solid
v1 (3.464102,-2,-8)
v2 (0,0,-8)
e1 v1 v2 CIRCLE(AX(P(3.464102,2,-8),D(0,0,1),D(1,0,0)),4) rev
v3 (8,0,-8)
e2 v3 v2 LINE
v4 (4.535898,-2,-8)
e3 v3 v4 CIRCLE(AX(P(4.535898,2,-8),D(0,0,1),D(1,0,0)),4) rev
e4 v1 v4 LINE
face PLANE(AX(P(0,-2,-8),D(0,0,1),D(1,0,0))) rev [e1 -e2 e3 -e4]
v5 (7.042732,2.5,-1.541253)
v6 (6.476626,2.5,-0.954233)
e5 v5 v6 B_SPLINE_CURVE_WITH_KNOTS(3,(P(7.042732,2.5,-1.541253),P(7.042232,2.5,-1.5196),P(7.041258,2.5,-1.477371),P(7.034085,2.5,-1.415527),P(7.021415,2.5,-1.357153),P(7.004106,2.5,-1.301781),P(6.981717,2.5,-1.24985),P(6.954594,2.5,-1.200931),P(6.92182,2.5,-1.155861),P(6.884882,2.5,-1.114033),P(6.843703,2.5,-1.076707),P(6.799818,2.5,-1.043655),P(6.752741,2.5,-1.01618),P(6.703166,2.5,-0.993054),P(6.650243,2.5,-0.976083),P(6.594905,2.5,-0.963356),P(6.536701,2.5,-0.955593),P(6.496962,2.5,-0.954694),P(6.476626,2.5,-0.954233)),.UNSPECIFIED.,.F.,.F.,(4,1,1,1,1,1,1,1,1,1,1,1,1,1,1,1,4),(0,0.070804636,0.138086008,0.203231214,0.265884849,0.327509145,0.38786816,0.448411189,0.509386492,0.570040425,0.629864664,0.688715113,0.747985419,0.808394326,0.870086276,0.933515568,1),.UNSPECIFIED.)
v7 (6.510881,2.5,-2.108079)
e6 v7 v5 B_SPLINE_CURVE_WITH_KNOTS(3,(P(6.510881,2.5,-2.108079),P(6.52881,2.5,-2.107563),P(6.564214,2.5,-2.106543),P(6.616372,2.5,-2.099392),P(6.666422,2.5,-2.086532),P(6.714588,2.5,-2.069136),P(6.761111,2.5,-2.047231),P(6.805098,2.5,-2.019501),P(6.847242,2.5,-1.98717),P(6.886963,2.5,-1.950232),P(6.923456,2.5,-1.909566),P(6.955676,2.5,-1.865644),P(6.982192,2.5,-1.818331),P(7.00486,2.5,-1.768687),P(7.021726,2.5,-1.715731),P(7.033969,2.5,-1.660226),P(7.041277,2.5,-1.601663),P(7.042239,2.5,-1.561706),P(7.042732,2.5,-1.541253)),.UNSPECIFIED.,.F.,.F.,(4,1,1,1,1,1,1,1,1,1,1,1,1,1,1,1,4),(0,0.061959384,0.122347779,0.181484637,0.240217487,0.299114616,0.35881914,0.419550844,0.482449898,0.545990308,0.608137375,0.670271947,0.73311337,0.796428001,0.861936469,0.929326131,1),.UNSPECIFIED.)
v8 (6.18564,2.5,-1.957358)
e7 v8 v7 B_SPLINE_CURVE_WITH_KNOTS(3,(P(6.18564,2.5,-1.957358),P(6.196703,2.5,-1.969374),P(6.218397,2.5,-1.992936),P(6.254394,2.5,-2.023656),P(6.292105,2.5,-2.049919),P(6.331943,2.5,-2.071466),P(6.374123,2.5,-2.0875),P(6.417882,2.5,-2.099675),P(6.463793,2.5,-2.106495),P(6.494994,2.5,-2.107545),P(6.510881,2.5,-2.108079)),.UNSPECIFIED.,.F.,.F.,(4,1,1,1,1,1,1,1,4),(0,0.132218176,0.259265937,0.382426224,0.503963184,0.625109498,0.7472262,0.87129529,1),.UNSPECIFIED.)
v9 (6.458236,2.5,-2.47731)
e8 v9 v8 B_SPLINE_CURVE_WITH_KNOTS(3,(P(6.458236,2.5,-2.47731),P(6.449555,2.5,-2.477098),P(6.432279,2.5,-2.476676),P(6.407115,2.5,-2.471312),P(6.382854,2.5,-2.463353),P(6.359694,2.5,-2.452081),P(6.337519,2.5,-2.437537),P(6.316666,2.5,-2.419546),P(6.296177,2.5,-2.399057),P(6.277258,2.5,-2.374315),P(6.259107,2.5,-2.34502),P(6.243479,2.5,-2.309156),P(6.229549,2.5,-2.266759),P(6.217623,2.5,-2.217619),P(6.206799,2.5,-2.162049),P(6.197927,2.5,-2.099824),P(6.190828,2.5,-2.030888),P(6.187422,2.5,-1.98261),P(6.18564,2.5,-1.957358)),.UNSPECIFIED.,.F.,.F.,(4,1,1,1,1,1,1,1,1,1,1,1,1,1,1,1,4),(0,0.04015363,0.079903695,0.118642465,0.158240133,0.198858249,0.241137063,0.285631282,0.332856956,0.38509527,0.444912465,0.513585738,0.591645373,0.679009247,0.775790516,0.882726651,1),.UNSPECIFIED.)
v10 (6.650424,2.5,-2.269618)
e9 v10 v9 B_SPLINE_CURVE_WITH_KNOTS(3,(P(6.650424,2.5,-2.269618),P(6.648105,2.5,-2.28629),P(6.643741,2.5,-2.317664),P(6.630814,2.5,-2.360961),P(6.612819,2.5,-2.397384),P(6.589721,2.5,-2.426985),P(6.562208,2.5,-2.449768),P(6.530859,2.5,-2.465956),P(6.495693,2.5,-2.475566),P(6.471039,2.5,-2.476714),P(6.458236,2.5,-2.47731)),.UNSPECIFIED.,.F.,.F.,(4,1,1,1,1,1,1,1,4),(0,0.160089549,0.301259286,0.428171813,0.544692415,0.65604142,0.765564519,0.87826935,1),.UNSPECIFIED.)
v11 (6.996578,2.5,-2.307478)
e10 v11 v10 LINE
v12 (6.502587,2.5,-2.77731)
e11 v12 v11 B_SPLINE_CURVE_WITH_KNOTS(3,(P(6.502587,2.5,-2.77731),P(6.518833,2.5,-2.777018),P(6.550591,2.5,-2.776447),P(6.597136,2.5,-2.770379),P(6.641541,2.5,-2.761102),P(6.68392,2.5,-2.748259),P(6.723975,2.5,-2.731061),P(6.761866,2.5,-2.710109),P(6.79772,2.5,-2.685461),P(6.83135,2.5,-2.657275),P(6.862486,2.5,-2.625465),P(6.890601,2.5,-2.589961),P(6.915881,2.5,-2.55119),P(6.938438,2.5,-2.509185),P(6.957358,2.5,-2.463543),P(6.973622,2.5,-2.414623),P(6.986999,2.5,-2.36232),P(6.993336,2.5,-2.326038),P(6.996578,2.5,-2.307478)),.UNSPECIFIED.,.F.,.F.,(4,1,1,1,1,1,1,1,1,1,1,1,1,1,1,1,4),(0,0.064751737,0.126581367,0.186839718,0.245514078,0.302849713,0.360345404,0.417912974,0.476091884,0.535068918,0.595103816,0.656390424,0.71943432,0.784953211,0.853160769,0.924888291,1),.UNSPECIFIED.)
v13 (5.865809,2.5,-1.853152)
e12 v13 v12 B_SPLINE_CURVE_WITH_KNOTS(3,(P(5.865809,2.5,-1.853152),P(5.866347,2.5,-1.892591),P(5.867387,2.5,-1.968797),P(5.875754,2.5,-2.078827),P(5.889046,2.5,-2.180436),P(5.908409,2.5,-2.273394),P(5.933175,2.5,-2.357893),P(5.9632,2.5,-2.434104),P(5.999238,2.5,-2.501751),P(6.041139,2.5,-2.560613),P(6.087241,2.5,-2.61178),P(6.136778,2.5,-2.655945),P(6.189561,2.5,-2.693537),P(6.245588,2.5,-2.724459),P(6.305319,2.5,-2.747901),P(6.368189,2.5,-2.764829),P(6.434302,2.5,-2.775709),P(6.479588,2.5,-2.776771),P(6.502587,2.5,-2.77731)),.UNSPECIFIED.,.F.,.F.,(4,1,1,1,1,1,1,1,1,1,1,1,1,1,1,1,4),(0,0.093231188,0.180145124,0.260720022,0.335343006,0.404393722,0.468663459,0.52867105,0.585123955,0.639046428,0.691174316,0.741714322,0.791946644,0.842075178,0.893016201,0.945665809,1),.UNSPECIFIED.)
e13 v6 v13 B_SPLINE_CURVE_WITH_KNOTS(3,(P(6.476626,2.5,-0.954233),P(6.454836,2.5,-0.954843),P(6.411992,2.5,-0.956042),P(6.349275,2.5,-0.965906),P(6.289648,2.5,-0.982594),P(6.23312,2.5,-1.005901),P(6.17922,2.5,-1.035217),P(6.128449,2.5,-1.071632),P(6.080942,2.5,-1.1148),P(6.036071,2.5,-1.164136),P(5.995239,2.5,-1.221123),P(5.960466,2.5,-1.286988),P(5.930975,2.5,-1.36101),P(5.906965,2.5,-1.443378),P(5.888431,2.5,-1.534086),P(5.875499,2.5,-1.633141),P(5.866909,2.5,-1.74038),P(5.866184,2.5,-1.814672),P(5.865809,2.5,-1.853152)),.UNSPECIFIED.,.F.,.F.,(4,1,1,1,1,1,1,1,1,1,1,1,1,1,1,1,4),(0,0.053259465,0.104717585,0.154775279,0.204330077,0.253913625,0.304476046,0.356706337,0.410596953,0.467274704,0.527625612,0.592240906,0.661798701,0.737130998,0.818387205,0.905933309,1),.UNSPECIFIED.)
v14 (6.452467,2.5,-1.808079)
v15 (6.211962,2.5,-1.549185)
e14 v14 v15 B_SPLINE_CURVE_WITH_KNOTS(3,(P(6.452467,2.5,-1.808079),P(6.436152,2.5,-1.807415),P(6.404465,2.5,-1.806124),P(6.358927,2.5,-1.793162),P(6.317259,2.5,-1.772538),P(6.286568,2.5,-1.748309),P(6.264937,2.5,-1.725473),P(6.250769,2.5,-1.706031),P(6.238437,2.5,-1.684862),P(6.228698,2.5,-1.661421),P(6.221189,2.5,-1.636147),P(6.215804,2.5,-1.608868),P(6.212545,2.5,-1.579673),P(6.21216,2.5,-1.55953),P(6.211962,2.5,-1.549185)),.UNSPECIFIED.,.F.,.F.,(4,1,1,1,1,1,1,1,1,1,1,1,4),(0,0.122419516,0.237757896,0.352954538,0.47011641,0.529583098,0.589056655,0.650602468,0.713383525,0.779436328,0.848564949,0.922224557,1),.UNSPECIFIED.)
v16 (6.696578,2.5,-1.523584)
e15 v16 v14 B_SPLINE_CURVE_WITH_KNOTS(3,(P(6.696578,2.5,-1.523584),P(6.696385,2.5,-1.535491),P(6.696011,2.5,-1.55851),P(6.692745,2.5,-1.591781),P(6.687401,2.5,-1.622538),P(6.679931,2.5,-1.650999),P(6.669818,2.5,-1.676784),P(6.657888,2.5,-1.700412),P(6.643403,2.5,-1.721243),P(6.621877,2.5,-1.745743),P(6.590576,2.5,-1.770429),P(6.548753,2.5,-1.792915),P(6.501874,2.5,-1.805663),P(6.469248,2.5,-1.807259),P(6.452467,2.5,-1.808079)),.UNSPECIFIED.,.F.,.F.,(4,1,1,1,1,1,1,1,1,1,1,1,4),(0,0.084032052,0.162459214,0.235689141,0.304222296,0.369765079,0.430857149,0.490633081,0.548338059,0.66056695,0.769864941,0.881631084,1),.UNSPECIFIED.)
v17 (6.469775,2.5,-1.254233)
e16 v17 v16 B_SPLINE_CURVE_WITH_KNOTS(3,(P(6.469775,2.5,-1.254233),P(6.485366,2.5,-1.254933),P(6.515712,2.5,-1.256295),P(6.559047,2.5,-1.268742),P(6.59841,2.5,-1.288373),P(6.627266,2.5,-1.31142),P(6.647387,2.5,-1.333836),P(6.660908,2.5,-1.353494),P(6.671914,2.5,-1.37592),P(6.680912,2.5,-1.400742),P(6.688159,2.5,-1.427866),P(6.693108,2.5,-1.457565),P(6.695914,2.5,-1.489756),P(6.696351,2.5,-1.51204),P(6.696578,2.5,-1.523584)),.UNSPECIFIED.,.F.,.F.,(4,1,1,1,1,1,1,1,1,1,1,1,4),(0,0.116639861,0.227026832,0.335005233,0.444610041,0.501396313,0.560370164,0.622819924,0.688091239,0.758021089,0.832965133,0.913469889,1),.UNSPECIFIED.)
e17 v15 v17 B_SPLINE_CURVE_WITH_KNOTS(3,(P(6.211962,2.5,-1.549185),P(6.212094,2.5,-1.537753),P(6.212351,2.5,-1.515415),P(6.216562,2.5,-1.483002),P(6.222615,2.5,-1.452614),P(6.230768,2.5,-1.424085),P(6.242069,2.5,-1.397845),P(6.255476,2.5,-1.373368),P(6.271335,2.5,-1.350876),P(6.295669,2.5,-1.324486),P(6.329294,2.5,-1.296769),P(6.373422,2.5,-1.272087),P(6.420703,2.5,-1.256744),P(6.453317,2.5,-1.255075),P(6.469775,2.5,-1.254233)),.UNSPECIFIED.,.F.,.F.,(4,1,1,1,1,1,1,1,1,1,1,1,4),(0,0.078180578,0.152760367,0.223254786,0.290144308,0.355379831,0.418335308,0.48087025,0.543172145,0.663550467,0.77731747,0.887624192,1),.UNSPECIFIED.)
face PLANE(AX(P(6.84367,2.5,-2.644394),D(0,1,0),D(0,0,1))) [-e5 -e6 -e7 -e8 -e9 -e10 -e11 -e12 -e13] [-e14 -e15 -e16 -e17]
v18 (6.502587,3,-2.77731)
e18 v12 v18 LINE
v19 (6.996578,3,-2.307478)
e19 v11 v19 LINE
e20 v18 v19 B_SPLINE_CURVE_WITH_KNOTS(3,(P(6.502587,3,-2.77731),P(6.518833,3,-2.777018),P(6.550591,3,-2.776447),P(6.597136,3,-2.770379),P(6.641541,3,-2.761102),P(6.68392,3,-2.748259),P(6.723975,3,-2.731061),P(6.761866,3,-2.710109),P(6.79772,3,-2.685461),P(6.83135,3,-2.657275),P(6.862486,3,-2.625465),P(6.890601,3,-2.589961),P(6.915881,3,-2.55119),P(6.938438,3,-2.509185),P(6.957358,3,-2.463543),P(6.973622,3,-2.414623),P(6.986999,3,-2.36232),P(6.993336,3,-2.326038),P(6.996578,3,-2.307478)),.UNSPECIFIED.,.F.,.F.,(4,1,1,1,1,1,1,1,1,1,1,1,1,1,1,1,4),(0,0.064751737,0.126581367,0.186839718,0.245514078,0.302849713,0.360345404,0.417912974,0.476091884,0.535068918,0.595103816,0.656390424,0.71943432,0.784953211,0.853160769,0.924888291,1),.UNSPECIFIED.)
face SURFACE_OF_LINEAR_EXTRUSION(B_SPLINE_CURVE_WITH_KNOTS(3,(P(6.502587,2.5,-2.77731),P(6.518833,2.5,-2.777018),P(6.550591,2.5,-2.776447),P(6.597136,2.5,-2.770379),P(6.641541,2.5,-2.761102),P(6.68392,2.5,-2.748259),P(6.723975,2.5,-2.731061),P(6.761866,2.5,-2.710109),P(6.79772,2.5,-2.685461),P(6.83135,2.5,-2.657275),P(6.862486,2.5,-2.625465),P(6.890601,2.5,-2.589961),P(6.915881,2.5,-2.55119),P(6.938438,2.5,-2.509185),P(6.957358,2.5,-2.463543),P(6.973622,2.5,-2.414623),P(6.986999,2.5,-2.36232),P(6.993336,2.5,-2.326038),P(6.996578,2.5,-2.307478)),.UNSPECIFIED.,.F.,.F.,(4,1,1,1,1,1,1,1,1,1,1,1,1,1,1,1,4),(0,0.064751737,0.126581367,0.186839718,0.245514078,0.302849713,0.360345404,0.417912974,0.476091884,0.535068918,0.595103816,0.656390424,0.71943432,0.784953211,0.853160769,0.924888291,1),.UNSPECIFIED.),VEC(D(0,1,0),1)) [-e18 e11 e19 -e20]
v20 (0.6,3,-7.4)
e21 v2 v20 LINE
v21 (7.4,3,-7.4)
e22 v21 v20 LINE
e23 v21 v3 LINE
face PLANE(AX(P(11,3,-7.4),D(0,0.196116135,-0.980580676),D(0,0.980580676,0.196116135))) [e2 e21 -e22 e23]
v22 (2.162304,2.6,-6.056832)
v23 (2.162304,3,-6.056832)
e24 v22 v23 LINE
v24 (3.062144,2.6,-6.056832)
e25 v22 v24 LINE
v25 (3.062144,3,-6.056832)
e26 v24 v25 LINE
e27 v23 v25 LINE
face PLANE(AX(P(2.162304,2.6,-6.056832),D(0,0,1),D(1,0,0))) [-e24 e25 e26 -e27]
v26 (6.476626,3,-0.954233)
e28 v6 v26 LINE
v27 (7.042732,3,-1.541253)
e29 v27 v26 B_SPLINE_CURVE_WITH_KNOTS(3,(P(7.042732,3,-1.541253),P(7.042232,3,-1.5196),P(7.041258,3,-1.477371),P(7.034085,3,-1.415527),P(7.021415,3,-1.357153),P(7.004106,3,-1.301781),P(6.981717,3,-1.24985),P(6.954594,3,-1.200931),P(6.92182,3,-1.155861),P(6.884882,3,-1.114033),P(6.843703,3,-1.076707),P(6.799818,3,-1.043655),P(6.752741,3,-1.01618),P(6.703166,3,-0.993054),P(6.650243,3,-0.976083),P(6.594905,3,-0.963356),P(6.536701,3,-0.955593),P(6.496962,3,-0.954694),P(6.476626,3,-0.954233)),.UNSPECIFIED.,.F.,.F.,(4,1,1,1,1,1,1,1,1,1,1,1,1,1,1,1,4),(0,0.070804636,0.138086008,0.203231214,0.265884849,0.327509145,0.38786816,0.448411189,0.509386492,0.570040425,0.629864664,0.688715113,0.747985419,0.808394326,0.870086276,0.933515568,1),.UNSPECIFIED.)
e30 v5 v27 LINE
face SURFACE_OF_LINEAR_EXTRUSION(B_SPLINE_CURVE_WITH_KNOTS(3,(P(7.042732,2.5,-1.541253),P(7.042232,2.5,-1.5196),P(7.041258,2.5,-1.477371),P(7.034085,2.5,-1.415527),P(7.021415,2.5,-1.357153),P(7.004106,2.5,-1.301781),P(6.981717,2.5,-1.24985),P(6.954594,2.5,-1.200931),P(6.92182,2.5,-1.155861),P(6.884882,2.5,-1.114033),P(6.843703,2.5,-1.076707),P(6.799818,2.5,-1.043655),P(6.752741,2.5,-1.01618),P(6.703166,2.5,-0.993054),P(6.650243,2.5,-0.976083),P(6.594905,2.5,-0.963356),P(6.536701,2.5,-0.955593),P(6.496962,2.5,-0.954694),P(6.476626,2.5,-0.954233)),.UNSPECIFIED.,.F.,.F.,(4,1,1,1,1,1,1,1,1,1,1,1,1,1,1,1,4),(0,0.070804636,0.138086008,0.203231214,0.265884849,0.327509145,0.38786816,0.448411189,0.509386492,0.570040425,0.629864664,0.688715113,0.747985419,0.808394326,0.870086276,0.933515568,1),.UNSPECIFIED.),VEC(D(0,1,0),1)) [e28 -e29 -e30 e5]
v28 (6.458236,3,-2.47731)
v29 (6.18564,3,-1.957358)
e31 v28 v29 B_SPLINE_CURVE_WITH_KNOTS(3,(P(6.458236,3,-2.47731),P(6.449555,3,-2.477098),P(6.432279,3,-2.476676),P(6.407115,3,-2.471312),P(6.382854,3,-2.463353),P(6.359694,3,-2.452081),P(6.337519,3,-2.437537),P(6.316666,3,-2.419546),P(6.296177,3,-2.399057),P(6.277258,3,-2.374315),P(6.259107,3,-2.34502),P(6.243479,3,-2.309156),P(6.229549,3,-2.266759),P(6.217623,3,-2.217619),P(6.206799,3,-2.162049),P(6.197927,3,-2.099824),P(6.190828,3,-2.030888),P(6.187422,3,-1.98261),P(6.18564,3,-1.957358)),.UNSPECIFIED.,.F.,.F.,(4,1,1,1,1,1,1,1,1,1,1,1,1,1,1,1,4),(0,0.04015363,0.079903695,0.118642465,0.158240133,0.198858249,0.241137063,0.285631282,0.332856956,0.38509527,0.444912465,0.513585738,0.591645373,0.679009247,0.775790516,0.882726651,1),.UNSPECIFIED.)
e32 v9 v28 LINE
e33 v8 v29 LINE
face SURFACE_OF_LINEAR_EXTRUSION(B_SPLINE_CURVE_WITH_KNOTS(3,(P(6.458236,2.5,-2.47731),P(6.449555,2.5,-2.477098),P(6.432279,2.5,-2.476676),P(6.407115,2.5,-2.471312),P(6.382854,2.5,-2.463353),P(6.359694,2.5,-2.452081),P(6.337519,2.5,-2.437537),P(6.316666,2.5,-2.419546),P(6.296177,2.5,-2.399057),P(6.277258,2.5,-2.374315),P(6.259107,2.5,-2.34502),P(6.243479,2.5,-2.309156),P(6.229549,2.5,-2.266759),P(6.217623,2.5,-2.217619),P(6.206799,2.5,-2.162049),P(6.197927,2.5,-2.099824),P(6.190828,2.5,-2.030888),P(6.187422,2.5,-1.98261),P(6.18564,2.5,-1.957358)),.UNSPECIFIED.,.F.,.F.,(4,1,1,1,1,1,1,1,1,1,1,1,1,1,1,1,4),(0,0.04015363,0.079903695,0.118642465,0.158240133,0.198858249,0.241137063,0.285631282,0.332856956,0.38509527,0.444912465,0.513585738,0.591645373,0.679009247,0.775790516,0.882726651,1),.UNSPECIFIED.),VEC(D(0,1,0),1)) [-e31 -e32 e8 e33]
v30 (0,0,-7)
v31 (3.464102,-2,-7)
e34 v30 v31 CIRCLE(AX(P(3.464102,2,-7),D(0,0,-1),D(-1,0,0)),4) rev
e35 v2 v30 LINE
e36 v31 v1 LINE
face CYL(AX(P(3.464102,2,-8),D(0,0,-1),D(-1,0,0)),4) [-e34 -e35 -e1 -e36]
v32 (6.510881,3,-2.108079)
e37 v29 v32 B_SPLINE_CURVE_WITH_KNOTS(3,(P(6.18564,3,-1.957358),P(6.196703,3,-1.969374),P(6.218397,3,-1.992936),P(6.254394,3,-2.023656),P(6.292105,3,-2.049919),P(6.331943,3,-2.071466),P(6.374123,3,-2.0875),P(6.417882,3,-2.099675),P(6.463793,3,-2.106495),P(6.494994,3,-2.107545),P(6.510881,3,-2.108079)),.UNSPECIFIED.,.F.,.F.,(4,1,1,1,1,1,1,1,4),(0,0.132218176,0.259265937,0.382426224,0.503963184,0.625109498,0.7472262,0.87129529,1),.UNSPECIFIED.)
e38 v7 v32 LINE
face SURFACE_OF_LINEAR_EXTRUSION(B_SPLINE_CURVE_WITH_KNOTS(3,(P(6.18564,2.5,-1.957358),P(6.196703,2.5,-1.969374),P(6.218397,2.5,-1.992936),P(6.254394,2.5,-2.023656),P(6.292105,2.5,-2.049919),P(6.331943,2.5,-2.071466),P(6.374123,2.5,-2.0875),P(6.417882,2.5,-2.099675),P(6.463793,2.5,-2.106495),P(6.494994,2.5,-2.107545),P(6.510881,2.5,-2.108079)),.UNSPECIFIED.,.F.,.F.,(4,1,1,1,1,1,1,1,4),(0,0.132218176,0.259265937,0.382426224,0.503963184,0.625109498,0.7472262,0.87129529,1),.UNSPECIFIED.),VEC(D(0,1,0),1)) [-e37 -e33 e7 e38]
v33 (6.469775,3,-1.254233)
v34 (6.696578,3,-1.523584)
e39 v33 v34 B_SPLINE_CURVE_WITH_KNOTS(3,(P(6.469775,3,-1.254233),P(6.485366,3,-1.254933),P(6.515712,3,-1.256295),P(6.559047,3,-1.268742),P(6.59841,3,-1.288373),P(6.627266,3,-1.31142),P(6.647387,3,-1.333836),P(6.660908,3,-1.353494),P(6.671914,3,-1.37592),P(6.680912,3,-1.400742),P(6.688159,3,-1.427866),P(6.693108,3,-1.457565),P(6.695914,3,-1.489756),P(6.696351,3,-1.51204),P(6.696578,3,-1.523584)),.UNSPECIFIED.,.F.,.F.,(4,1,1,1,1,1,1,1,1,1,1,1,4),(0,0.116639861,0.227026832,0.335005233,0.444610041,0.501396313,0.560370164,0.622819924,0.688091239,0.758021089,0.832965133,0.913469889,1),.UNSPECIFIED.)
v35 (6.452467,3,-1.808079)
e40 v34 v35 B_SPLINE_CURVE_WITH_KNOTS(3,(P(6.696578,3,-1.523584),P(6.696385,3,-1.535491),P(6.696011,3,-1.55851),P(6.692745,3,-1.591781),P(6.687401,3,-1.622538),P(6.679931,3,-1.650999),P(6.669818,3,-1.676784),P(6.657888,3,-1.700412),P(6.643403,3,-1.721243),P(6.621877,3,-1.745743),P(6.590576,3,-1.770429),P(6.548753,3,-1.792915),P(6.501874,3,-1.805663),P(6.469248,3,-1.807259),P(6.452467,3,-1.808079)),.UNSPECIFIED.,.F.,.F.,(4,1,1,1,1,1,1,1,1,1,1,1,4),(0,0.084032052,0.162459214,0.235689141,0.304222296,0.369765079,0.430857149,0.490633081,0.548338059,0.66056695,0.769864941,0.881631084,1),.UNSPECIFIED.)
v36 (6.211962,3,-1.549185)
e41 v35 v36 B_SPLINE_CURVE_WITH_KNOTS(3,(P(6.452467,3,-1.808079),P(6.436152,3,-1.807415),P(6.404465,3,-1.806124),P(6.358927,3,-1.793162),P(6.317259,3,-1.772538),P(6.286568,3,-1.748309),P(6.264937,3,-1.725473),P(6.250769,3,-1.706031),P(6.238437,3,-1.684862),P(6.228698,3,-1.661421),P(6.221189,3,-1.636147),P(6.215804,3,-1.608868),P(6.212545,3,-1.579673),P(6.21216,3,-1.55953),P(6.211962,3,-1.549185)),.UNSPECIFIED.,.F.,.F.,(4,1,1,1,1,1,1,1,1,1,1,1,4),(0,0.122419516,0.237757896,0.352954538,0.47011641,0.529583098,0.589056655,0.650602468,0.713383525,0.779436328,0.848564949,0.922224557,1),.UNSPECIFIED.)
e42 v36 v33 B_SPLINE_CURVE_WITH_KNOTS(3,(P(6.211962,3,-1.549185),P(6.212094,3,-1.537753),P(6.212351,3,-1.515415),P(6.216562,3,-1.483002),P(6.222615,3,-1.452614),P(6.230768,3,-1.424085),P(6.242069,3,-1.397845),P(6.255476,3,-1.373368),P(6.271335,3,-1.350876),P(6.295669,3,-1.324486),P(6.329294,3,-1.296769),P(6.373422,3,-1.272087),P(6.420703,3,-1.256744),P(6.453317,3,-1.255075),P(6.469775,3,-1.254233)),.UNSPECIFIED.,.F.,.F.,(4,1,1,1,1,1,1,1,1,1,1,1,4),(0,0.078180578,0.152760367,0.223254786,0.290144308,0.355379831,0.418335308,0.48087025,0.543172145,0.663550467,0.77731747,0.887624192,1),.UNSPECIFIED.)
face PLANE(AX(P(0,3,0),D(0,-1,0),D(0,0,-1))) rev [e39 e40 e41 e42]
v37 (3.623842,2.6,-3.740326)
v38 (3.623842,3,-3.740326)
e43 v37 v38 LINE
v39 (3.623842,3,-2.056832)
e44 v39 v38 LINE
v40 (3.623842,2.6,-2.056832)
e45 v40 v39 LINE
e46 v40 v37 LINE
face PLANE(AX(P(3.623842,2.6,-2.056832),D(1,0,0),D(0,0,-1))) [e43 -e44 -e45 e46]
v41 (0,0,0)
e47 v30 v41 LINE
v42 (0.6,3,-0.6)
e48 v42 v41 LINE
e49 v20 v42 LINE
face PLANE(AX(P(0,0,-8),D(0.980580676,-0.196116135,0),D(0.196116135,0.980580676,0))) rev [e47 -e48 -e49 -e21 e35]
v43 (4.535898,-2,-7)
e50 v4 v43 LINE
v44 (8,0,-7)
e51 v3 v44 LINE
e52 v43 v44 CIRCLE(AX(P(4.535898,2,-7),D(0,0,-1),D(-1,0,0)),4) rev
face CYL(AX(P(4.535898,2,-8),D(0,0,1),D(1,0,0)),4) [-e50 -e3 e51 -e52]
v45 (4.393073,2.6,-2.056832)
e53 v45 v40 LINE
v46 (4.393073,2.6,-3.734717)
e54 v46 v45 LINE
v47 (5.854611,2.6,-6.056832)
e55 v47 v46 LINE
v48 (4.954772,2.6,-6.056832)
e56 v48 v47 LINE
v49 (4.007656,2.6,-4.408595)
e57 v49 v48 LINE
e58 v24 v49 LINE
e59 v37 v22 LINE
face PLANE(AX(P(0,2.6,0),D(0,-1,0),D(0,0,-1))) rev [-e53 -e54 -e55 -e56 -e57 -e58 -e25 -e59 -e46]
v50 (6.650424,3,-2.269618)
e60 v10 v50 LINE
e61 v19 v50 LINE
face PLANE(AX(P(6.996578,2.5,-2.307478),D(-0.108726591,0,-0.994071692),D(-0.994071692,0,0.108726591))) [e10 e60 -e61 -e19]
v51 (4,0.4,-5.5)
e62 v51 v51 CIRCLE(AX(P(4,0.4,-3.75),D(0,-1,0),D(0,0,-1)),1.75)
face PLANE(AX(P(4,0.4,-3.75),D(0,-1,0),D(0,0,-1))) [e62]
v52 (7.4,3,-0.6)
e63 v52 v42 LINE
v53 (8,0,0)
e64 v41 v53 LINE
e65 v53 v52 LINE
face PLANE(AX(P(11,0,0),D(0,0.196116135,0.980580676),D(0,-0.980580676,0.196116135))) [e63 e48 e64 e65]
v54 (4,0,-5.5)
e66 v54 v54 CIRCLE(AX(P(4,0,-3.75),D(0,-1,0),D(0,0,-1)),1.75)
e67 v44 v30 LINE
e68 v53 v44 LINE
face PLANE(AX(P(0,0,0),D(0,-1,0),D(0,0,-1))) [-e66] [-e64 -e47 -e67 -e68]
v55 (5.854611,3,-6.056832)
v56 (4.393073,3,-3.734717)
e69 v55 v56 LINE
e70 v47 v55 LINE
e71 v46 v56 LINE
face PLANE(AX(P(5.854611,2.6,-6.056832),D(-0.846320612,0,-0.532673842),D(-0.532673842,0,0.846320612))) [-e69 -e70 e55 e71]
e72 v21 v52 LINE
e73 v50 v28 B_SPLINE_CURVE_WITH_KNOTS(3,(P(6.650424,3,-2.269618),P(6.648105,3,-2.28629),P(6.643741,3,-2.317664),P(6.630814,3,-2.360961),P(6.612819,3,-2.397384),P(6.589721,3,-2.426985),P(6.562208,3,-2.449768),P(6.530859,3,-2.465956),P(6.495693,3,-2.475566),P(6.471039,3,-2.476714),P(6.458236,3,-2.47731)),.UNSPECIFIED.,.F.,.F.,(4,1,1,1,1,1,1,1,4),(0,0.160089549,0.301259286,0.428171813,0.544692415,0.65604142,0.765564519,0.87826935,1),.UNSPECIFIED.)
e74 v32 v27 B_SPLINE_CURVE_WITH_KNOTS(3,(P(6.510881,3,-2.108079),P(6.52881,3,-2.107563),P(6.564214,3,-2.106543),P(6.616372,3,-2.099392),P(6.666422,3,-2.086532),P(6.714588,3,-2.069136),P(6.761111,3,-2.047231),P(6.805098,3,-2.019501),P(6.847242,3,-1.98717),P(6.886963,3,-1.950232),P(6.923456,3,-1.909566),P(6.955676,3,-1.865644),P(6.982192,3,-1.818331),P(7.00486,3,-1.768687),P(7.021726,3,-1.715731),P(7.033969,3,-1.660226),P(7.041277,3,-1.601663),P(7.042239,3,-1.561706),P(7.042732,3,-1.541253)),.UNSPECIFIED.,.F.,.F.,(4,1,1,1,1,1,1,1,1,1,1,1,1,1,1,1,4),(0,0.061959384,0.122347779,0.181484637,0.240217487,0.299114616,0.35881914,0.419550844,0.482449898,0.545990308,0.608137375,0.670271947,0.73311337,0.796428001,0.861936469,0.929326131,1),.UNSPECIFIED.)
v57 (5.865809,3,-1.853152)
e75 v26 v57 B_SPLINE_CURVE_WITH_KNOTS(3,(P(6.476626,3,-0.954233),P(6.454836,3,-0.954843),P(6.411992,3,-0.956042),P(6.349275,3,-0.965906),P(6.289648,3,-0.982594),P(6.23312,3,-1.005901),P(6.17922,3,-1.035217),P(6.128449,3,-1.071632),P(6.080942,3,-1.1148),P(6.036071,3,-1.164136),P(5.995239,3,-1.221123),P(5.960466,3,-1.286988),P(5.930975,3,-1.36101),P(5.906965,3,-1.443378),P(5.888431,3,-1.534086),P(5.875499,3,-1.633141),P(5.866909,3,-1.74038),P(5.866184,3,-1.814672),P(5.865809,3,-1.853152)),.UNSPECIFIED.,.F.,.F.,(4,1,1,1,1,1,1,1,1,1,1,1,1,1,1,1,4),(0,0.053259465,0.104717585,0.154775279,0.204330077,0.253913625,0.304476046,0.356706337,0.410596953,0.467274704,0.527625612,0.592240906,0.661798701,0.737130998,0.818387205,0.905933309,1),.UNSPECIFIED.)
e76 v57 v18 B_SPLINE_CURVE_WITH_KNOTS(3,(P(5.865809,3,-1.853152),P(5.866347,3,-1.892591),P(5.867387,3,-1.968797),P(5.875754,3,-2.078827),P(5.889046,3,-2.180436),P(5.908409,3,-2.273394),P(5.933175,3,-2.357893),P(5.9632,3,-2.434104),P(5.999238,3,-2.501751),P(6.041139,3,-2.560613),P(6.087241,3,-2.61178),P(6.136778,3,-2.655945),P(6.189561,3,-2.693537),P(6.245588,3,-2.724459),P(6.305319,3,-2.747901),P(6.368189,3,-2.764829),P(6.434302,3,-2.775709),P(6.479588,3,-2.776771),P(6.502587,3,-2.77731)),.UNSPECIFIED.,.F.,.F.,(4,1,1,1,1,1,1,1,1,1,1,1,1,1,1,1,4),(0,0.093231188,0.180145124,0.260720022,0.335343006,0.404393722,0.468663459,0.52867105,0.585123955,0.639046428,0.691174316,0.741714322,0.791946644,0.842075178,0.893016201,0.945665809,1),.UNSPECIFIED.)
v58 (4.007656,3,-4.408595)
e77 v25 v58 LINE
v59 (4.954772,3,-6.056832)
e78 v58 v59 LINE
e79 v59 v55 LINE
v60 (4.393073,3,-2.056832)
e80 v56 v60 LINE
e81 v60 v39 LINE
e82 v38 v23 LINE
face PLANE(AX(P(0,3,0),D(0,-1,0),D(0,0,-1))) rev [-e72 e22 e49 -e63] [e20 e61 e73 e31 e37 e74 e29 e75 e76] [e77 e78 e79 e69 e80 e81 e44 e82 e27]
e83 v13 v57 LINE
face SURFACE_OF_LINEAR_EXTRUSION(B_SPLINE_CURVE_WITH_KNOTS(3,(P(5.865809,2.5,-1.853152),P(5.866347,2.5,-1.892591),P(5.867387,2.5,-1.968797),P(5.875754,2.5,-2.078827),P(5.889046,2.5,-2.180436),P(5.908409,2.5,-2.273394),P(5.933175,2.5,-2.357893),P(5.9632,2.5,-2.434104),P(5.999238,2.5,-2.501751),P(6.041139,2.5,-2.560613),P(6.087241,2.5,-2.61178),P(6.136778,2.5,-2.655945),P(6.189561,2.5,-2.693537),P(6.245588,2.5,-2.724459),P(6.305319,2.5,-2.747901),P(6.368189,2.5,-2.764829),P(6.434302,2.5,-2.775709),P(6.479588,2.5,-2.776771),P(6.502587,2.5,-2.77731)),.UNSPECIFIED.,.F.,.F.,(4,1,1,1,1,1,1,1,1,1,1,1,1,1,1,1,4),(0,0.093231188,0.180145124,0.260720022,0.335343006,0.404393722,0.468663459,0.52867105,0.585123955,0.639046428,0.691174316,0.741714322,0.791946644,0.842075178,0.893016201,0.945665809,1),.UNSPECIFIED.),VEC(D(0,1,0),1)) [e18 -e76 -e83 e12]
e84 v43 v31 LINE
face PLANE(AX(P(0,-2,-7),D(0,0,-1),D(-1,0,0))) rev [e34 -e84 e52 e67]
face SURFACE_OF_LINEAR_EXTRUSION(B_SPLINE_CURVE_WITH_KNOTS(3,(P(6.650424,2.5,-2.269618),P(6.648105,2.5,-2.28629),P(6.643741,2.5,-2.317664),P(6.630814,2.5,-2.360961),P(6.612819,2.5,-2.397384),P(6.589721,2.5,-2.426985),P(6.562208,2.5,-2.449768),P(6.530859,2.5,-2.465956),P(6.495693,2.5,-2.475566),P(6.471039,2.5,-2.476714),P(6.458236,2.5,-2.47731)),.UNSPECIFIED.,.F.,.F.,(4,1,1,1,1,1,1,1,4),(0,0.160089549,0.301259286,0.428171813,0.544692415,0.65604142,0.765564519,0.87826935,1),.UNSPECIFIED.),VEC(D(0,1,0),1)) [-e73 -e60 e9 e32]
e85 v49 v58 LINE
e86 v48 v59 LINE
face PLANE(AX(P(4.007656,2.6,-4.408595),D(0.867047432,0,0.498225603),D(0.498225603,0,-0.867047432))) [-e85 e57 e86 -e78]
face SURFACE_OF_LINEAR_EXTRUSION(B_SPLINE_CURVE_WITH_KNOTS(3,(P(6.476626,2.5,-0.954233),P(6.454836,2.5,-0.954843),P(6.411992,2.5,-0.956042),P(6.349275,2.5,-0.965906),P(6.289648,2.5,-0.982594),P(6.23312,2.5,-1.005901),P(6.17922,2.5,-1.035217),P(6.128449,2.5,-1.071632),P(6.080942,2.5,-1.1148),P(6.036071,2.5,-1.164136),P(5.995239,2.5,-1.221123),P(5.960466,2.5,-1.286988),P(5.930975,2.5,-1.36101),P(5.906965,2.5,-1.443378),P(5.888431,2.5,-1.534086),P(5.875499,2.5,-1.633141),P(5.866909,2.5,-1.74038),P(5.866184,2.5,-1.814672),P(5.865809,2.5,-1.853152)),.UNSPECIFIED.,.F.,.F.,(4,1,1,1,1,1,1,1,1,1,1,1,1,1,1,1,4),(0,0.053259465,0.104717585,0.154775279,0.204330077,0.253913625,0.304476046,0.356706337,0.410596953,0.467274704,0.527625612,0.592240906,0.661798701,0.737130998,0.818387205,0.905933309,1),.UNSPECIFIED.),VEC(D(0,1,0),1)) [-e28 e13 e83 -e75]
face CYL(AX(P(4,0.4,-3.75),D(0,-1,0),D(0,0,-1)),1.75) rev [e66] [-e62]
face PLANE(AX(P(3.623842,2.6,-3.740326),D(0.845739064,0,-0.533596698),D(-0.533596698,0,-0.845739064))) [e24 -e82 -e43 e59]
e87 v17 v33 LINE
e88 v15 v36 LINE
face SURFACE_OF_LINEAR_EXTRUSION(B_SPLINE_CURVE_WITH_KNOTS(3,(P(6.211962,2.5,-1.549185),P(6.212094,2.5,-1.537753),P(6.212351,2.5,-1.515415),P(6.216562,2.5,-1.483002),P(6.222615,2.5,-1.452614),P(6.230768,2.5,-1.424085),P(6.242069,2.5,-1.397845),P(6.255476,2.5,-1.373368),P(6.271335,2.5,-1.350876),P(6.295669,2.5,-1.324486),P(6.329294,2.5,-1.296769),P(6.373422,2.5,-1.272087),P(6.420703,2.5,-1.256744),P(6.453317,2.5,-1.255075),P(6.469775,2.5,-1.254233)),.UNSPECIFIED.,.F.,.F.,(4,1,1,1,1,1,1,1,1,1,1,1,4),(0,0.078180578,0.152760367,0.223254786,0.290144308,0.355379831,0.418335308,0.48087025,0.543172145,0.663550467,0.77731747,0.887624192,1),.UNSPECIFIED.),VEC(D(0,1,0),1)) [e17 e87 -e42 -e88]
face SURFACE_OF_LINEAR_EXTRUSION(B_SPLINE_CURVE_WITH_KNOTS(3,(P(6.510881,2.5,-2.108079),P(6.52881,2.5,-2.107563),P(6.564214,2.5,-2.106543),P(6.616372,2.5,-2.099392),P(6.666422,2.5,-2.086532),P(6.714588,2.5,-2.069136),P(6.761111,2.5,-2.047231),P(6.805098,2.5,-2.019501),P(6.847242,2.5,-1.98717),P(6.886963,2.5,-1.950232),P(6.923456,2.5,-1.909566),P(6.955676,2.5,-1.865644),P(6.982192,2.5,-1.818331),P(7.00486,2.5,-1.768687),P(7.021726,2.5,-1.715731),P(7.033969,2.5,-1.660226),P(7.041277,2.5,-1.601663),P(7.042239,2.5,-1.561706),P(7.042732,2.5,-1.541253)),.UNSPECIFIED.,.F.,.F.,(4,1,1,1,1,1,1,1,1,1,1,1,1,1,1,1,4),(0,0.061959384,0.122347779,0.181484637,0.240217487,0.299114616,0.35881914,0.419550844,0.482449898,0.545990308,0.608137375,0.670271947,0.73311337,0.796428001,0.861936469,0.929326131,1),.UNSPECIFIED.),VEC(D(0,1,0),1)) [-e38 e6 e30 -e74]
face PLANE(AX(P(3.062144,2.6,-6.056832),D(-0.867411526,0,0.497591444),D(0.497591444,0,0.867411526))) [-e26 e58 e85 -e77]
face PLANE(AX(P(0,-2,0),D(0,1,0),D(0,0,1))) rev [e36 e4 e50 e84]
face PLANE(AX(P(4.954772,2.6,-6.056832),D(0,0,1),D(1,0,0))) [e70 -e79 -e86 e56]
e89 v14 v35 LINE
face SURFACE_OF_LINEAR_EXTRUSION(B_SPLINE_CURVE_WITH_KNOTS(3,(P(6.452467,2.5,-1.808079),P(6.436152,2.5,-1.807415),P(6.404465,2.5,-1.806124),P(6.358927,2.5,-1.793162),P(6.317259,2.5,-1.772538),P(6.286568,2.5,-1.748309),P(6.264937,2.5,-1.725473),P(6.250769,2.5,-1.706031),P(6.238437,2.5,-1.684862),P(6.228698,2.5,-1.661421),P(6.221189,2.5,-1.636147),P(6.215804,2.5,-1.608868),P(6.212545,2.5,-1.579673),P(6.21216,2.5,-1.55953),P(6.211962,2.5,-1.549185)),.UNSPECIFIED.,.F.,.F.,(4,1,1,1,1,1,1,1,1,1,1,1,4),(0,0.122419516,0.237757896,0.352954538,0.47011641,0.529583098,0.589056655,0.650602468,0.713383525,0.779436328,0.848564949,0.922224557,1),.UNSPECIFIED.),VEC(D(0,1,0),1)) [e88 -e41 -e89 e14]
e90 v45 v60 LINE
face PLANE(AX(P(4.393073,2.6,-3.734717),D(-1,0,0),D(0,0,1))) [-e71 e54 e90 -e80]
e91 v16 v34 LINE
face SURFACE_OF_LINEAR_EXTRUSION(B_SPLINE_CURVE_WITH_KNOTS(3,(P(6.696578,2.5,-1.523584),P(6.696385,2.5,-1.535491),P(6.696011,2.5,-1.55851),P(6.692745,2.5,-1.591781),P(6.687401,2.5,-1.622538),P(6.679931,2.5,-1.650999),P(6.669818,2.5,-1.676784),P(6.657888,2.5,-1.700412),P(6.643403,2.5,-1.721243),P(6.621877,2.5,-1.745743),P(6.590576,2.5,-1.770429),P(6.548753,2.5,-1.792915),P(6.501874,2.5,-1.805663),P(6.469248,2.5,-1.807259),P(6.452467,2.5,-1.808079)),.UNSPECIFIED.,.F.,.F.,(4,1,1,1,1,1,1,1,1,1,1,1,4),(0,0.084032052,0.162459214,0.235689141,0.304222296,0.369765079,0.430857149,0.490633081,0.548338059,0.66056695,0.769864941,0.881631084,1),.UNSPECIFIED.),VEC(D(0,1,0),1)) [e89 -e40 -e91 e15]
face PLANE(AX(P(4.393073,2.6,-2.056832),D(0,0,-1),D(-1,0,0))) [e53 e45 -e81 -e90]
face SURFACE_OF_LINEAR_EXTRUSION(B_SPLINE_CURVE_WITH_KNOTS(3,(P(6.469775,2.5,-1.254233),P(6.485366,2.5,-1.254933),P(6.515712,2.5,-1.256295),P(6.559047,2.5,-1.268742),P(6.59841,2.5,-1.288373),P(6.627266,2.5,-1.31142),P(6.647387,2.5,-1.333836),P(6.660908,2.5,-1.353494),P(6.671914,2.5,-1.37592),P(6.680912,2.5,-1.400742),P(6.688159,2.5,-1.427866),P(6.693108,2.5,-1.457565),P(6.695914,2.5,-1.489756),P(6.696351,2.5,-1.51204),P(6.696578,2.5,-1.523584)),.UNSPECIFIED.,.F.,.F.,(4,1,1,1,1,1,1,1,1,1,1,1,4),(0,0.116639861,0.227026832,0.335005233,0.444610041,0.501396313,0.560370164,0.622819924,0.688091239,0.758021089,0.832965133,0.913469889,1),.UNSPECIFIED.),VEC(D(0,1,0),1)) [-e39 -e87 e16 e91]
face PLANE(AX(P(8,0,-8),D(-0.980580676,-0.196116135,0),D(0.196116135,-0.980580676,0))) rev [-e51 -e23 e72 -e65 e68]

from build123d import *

# Parameters (mm, degrees)
SKETCH1_W               = 8
SKETCH1_H               = 8
BOSS_EXTRUDE1_DEPTH     = 3
CUT_EXTRUDE1_DEPTH      = 12.704699911
CUT_EXTRUDE1_DEPTH_BACK = 12.704699911
CUT_EXTRUDE2_DEPTH      = 11
SKETCH4_R               = 1.75
CUT_EXTRUDE3_DEPTH      = 0.4
SKETCH5_W               = 8
SKETCH5_H               = 1
BOSS_EXTRUDE2_DEPTH     = 2
FILLET1_R               = 4
CUT_EXTRUDE4_DEPTH      = 0.4
CUT_EXTRUDE5_DEPTH      = 0.5


with BuildPart() as part:
    # Sketch1 → Boss-Extrude1 (new body)
    with BuildSketch(Plane(origin=(0, 0, 0), x_dir=(1, 0, 0), z_dir=(0, 1, 0))):
        with Locations((4, 4)):
            Rectangle(SKETCH1_W, SKETCH1_H)
    extrude(amount=BOSS_EXTRUDE1_DEPTH)

    # Sketch2 → Cut-Extrude1 (cut, two sides: drawn at the far end of the back side and taken through both)
    with BuildSketch(Plane.XY.offset(-CUT_EXTRUDE1_DEPTH_BACK)):
        Polygon((0, 0), (0.6, 3), (0, 3), align=None)
        Polygon((8, 0), (7.4, 3), (8, 3), align=None)
    extrude(amount=CUT_EXTRUDE1_DEPTH + CUT_EXTRUDE1_DEPTH_BACK, mode=Mode.SUBTRACT)

    # Sketch3 → Cut-Extrude2 (cut)
    with BuildSketch(Plane(origin=(0, 0, 0), x_dir=(0, 0, -1), z_dir=(1, 0, 0))):
        Polygon((0, 0), (0.6, 3), (0, 3), align=None)
        Polygon((8, 3), (7.4, 3), (8, 0), align=None)
    extrude(amount=CUT_EXTRUDE2_DEPTH, mode=Mode.SUBTRACT)

    # Sketch4 → Cut-Extrude3 (cut)
    with BuildSketch(Plane.XZ):
        with Locations(Location((4, -3.75, 0), (0, 0, 270))):
            Circle(SKETCH4_R)
    extrude(amount=-CUT_EXTRUDE3_DEPTH, mode=Mode.SUBTRACT)

    # Sketch5 → Boss-Extrude2 (add)
    with BuildSketch(Plane.XZ):
        with Locations((4, -7.5)):
            Rectangle(SKETCH5_W, SKETCH5_H)
    extrude(amount=BOSS_EXTRUDE2_DEPTH)

    # Fillet1
    # the kernel refuses this fillet: 4 mm, written as the material it takes off along each edge
    with BuildSketch(Plane(origin=(8, -2, -16.660254038), x_dir=(0, 1, 0), z_dir=(0, 0, 1)), Plane(origin=(0, -2, 1.660254038), x_dir=(0, 1, 0), z_dir=(0, 0, -1))) as fillet1_piece_1:
        with BuildLine():
            CenterArc((4, 3.464101615), FILLET1_R, 180, 60)
            Line((0, 3.464101615), (-0.08, 3.464101615))
            Line((-0.08, 3.464101615), (-0.08, 0))
            Line((-0.08, 0), (0, -0.08))
            ThreePointArc((0, -0.08), (1, -0.08), (1.96, -0.069282032))
            Line((1.96, -0.069282032), (2, 0))
        make_face()
    extrude(amount=18.320508076, mode=Mode.SUBTRACT)

    # Sketch6 → Cut-Extrude4 (cut)
    with BuildSketch(Plane(origin=(0, 3, 0), x_dir=(1, 0, 0), z_dir=(0, 1, 0))):
        Polygon((3.623842243, 2.056832464), (3.623842243, 3.740326053), (2.162303782, 6.056832464), (3.062143525, 6.056832464), (4.007656346, 4.408595284), (4.95477173, 6.056832464), (5.854611474, 6.056832464), (4.393073013, 3.734717079), (4.393073013, 2.056832464), align=None)
    extrude(amount=-CUT_EXTRUDE4_DEPTH, mode=Mode.SUBTRACT)

    # Sketch7 → Cut-Extrude5 (cut)
    with BuildSketch(Plane(origin=(0, 3, 0), x_dir=(1, 0, 0), z_dir=(0, 1, 0))):
        with BuildLine():
            Line((6.99657775, 2.307478491), (6.650423904, 2.269617914))
            add(Edge.make_bspline(
                [(6.650423904, 2.269617914), (6.648104786, 2.286290214), (6.643740629, 2.317664439), (6.630814222, 2.360960848), (6.6128192, 2.397384178), (6.589720846, 2.426985356), (6.562208273, 2.449767653), (6.53085918, 2.465955864), (6.495693494, 2.475565581), (6.471038508, 2.476713937), (6.458236404, 2.477310221)],
                knots=[0, 0, 0, 0, 1.280716388, 2.410074291, 3.425374506, 4.35753932, 5.248331359, 6.12451615, 7.026154803, 8, 8, 8, 8], degree=3))
            add(Edge.make_bspline(
                [(6.458236404, 2.477310221), (6.449554942, 2.477097941), (6.432279271, 2.476675513), (6.407115159, 2.471312362), (6.382853927, 2.463353411), (6.359693582, 2.452081234), (6.337518567, 2.437536581), (6.316665994, 2.419545601), (6.296177185, 2.39905664), (6.277258092, 2.37431526), (6.259107425, 2.34501973), (6.243478966, 2.309156475), (6.229549311, 2.266758815), (6.217622545, 2.217619097), (6.206799126, 2.162049229), (6.197926997, 2.099824257), (6.190827571, 2.030888275), (6.1874217, 1.982610246), (6.18564025, 1.957358298)],
                knots=[0, 0, 0, 0, 0.642458078, 1.278459126, 1.898279436, 2.531842133, 3.181731979, 3.858193002, 4.57010051, 5.325711302, 6.161524323, 7.118599443, 8.217371811, 9.466325973, 10.864147948, 12.412648259, 14.123626419, 16, 16, 16, 16], degree=3))
            add(Edge.make_bspline(
                [(6.18564025, 1.957358298), (6.196703374, 1.969374309), (6.218396997, 1.992936442), (6.254393564, 2.023656049), (6.292105324, 2.049919261), (6.331942634, 2.071465901), (6.374122941, 2.087500286), (6.417882183, 2.099674887), (6.463793169, 2.1064945), (6.494994081, 2.107544715), (6.510880634, 2.108079452)],
                knots=[0, 0, 0, 0, 1.057745406, 2.074127497, 3.059409796, 4.031705469, 5.000875988, 5.977809597, 6.970362319, 8, 8, 8, 8], degree=3))
            add(Edge.make_bspline(
                [(6.510880634, 2.108079452), (6.528809934, 2.107563089), (6.564213931, 2.106543456), (6.616372239, 2.099391957), (6.666421561, 2.086532277), (6.714588312, 2.069136373), (6.761110551, 2.047230594), (6.805098359, 2.019501147), (6.847242227, 1.987169858), (6.886962554, 1.950231753), (6.923455982, 1.909566001), (6.95567607, 1.865643773), (6.982192143, 1.818330938), (7.00486021, 1.76868676), (7.021726117, 1.715731209), (7.033968982, 1.660226315), (7.04127711, 1.601662587), (7.042239139, 1.561706039), (7.042731596, 1.541252529)],
                knots=[0, 0, 0, 0, 0.99135015, 1.957564468, 2.903754199, 3.843479786, 4.78583385, 5.741106244, 6.712813504, 7.719198368, 8.735844933, 9.730198001, 10.724351158, 11.729813921, 12.742848014, 13.790983496, 14.86921809, 16, 16, 16, 16], degree=3))
            add(Edge.make_bspline(
                [(7.042731596, 1.541252529), (7.042231952, 1.519599685), (7.041257525, 1.477371451), (7.034085066, 1.415527203), (7.021415455, 1.357153196), (7.004106031, 1.301781092), (6.981716795, 1.249849655), (6.954594052, 1.200930916), (6.921819947, 1.155860856), (6.884881845, 1.114033218), (6.84370317, 1.076707467), (6.799818397, 1.043655074), (6.752740779, 1.016179585), (6.703166183, 0.993054256), (6.650243128, 0.9760833), (6.594904638, 0.963355935), (6.536700741, 0.955593381), (6.496962304, 0.954693712), (6.476625827, 0.954233298)],
                knots=[0, 0, 0, 0, 1.13287417, 2.209376133, 3.25169942, 4.254157582, 5.240146322, 6.205890558, 7.174579019, 8.150183866, 9.1206468, 10.07783463, 11.019441811, 11.967766696, 12.934309213, 13.921380422, 14.936249089, 16, 16, 16, 16], degree=3))
            add(Edge.make_bspline(
                [(6.476625827, 0.954233298), (6.454835686, 0.954842926), (6.411992392, 0.956041562), (6.349274568, 0.965905733), (6.289647802, 0.982594351), (6.233119501, 1.005900716), (6.179219819, 1.035216515), (6.128449255, 1.071632083), (6.080942348, 1.114800151), (6.036070744, 1.164136126), (5.995238787, 1.221123075), (5.960465944, 1.286988003), (5.930975089, 1.361009558), (5.906965213, 1.443377578), (5.888431321, 1.534085529), (5.875498792, 1.633141016), (5.86690889, 1.740380226), (5.866183985, 1.814672002), (5.865808519, 1.853151567)],
                knots=[0, 0, 0, 0, 0.852151446, 1.675481364, 2.476404467, 3.269281233, 4.062617998, 4.871616733, 5.707301388, 6.56955125, 7.476395267, 8.442009786, 9.475854496, 10.58877921, 11.794095973, 13.094195288, 14.494932947, 16, 16, 16, 16], degree=3))
            add(Edge.make_bspline(
                [(5.865808519, 1.853151567), (5.866346697, 1.892590697), (5.867386586, 1.968796599), (5.875754473, 2.078827487), (5.889046125, 2.180436336), (5.908408745, 2.273394012), (5.933175033, 2.357893394), (5.963200156, 2.434104295), (5.99923844, 2.501750812), (6.041138584, 2.560612949), (6.087240817, 2.61177964), (6.136777869, 2.655945181), (6.189560624, 2.693536639), (6.245587817, 2.724459089), (6.305319384, 2.747901225), (6.368188753, 2.764829378), (6.434301522, 2.775708833), (6.479587723, 2.776770851), (6.502587365, 2.777310221)],
                knots=[0, 0, 0, 0, 1.491699013, 2.882321987, 4.171520357, 5.365488089, 6.470299549, 7.49861535, 8.458736801, 9.361983288, 10.224742848, 11.058789056, 11.867429157, 12.671146298, 13.473202851, 14.288259215, 15.130652936, 16, 16, 16, 16], degree=3))
            add(Edge.make_bspline(
                [(6.502587365, 2.777310221), (6.518832845, 2.777017956), (6.550590682, 2.776446616), (6.597136362, 2.770379458), (6.641540508, 2.76110179), (6.683919501, 2.748259344), (6.723974963, 2.731060825), (6.761865954, 2.710109046), (6.797719857, 2.685460752), (6.831350121, 2.657274635), (6.862486078, 2.625465393), (6.890601127, 2.589961055), (6.915881459, 2.551190115), (6.938437714, 2.509184749), (6.957357529, 2.46354265), (6.973622233, 2.414622738), (6.98699882, 2.362319913), (6.993336088, 2.326037695), (6.99657775, 2.307478491)],
                knots=[0, 0, 0, 0, 1.036027791, 2.025301876, 2.989435482, 3.928225244, 4.845595412, 5.765526461, 6.686607585, 7.61747015, 8.561102691, 9.521661062, 10.50224679, 11.510949117, 12.559251378, 13.650572309, 14.798212656, 16, 16, 16, 16], degree=3))
        make_face()
        with BuildLine():
            add(Edge.make_bspline(
                [(6.211962365, 1.549185221), (6.212093793, 1.537753077), (6.212350595, 1.515415322), (6.216561681, 1.483001611), (6.222614755, 1.452614338), (6.230767911, 1.42408476), (6.242068736, 1.397844656), (6.255476173, 1.373367715), (6.271335314, 1.350875727), (6.295669246, 1.324486058), (6.329294099, 1.29676891), (6.373421783, 1.272086886), (6.420703408, 1.256744198), (6.453316703, 1.255075433), (6.469774865, 1.254233298)],
                knots=[0, 0, 0, 0, 0.93816693, 1.833124408, 2.679057427, 3.481731691, 4.264557977, 5.020023694, 5.770442996, 6.518065735, 7.962605608, 9.32780964, 10.651490302, 12, 12, 12, 12], degree=3))
            add(Edge.make_bspline(
                [(6.469774865, 1.254233298), (6.485365796, 1.254933043), (6.51571185, 1.256295021), (6.559046727, 1.268742487), (6.598409917, 1.288373431), (6.627266187, 1.311420354), (6.647387039, 1.333836313), (6.660907792, 1.353494474), (6.671913698, 1.375919542), (6.680911589, 1.400742183), (6.688159323, 1.427866383), (6.693107691, 1.457564676), (6.69591447, 1.48975573), (6.696351403, 1.512040132), (6.69657775, 1.52358426)],
                knots=[0, 0, 0, 0, 1.399678333, 2.724321989, 4.020062797, 5.33532049, 6.016755754, 6.724441967, 7.473839083, 8.257094862, 9.096253071, 9.995581596, 10.961638663, 12, 12, 12, 12], degree=3))
            add(Edge.make_bspline(
                [(6.69657775, 1.52358426), (6.696384678, 1.535490976), (6.696011412, 1.558510238), (6.692745041, 1.591780733), (6.687401372, 1.622537963), (6.679930507, 1.650999261), (6.669817892, 1.676783929), (6.657887501, 1.700412041), (6.643402955, 1.721242874), (6.621876525, 1.745742616), (6.590576263, 1.770429427), (6.548753213, 1.792915191), (6.501874013, 1.805662518), (6.469248141, 1.807258544), (6.452467173, 1.808079452)],
                knots=[0, 0, 0, 0, 1.008384627, 1.949510571, 2.828269698, 3.650667555, 4.437180943, 5.170285793, 5.887596972, 6.580056709, 7.926803404, 9.238379296, 10.579573008, 12, 12, 12, 12], degree=3))
            add(Edge.make_bspline(
                [(6.452467173, 1.808079452), (6.436151813, 1.807414866), (6.404464825, 1.806124136), (6.358926875, 1.793162443), (6.31725918, 1.772538153), (6.286568407, 1.748308757), (6.264936989, 1.725473324), (6.25076935, 1.706030549), (6.238437114, 1.684862342), (6.228698053, 1.661421349), (6.221189386, 1.636147459), (6.215803903, 1.608867965), (6.212544961, 1.579673333), (6.212160051, 1.559530412), (6.211962365, 1.549185221)],
                knots=[0, 0, 0, 0, 1.469034193, 2.853094746, 4.235454457, 5.641396914, 6.354997179, 7.06867986, 7.807229614, 8.560602297, 9.353235934, 10.182779392, 11.06669468, 12, 12, 12, 12], degree=3))
        make_face(mode=Mode.SUBTRACT)
    extrude(amount=-CUT_EXTRUDE5_DEPTH, mode=Mode.SUBTRACT)


solid = part.part
